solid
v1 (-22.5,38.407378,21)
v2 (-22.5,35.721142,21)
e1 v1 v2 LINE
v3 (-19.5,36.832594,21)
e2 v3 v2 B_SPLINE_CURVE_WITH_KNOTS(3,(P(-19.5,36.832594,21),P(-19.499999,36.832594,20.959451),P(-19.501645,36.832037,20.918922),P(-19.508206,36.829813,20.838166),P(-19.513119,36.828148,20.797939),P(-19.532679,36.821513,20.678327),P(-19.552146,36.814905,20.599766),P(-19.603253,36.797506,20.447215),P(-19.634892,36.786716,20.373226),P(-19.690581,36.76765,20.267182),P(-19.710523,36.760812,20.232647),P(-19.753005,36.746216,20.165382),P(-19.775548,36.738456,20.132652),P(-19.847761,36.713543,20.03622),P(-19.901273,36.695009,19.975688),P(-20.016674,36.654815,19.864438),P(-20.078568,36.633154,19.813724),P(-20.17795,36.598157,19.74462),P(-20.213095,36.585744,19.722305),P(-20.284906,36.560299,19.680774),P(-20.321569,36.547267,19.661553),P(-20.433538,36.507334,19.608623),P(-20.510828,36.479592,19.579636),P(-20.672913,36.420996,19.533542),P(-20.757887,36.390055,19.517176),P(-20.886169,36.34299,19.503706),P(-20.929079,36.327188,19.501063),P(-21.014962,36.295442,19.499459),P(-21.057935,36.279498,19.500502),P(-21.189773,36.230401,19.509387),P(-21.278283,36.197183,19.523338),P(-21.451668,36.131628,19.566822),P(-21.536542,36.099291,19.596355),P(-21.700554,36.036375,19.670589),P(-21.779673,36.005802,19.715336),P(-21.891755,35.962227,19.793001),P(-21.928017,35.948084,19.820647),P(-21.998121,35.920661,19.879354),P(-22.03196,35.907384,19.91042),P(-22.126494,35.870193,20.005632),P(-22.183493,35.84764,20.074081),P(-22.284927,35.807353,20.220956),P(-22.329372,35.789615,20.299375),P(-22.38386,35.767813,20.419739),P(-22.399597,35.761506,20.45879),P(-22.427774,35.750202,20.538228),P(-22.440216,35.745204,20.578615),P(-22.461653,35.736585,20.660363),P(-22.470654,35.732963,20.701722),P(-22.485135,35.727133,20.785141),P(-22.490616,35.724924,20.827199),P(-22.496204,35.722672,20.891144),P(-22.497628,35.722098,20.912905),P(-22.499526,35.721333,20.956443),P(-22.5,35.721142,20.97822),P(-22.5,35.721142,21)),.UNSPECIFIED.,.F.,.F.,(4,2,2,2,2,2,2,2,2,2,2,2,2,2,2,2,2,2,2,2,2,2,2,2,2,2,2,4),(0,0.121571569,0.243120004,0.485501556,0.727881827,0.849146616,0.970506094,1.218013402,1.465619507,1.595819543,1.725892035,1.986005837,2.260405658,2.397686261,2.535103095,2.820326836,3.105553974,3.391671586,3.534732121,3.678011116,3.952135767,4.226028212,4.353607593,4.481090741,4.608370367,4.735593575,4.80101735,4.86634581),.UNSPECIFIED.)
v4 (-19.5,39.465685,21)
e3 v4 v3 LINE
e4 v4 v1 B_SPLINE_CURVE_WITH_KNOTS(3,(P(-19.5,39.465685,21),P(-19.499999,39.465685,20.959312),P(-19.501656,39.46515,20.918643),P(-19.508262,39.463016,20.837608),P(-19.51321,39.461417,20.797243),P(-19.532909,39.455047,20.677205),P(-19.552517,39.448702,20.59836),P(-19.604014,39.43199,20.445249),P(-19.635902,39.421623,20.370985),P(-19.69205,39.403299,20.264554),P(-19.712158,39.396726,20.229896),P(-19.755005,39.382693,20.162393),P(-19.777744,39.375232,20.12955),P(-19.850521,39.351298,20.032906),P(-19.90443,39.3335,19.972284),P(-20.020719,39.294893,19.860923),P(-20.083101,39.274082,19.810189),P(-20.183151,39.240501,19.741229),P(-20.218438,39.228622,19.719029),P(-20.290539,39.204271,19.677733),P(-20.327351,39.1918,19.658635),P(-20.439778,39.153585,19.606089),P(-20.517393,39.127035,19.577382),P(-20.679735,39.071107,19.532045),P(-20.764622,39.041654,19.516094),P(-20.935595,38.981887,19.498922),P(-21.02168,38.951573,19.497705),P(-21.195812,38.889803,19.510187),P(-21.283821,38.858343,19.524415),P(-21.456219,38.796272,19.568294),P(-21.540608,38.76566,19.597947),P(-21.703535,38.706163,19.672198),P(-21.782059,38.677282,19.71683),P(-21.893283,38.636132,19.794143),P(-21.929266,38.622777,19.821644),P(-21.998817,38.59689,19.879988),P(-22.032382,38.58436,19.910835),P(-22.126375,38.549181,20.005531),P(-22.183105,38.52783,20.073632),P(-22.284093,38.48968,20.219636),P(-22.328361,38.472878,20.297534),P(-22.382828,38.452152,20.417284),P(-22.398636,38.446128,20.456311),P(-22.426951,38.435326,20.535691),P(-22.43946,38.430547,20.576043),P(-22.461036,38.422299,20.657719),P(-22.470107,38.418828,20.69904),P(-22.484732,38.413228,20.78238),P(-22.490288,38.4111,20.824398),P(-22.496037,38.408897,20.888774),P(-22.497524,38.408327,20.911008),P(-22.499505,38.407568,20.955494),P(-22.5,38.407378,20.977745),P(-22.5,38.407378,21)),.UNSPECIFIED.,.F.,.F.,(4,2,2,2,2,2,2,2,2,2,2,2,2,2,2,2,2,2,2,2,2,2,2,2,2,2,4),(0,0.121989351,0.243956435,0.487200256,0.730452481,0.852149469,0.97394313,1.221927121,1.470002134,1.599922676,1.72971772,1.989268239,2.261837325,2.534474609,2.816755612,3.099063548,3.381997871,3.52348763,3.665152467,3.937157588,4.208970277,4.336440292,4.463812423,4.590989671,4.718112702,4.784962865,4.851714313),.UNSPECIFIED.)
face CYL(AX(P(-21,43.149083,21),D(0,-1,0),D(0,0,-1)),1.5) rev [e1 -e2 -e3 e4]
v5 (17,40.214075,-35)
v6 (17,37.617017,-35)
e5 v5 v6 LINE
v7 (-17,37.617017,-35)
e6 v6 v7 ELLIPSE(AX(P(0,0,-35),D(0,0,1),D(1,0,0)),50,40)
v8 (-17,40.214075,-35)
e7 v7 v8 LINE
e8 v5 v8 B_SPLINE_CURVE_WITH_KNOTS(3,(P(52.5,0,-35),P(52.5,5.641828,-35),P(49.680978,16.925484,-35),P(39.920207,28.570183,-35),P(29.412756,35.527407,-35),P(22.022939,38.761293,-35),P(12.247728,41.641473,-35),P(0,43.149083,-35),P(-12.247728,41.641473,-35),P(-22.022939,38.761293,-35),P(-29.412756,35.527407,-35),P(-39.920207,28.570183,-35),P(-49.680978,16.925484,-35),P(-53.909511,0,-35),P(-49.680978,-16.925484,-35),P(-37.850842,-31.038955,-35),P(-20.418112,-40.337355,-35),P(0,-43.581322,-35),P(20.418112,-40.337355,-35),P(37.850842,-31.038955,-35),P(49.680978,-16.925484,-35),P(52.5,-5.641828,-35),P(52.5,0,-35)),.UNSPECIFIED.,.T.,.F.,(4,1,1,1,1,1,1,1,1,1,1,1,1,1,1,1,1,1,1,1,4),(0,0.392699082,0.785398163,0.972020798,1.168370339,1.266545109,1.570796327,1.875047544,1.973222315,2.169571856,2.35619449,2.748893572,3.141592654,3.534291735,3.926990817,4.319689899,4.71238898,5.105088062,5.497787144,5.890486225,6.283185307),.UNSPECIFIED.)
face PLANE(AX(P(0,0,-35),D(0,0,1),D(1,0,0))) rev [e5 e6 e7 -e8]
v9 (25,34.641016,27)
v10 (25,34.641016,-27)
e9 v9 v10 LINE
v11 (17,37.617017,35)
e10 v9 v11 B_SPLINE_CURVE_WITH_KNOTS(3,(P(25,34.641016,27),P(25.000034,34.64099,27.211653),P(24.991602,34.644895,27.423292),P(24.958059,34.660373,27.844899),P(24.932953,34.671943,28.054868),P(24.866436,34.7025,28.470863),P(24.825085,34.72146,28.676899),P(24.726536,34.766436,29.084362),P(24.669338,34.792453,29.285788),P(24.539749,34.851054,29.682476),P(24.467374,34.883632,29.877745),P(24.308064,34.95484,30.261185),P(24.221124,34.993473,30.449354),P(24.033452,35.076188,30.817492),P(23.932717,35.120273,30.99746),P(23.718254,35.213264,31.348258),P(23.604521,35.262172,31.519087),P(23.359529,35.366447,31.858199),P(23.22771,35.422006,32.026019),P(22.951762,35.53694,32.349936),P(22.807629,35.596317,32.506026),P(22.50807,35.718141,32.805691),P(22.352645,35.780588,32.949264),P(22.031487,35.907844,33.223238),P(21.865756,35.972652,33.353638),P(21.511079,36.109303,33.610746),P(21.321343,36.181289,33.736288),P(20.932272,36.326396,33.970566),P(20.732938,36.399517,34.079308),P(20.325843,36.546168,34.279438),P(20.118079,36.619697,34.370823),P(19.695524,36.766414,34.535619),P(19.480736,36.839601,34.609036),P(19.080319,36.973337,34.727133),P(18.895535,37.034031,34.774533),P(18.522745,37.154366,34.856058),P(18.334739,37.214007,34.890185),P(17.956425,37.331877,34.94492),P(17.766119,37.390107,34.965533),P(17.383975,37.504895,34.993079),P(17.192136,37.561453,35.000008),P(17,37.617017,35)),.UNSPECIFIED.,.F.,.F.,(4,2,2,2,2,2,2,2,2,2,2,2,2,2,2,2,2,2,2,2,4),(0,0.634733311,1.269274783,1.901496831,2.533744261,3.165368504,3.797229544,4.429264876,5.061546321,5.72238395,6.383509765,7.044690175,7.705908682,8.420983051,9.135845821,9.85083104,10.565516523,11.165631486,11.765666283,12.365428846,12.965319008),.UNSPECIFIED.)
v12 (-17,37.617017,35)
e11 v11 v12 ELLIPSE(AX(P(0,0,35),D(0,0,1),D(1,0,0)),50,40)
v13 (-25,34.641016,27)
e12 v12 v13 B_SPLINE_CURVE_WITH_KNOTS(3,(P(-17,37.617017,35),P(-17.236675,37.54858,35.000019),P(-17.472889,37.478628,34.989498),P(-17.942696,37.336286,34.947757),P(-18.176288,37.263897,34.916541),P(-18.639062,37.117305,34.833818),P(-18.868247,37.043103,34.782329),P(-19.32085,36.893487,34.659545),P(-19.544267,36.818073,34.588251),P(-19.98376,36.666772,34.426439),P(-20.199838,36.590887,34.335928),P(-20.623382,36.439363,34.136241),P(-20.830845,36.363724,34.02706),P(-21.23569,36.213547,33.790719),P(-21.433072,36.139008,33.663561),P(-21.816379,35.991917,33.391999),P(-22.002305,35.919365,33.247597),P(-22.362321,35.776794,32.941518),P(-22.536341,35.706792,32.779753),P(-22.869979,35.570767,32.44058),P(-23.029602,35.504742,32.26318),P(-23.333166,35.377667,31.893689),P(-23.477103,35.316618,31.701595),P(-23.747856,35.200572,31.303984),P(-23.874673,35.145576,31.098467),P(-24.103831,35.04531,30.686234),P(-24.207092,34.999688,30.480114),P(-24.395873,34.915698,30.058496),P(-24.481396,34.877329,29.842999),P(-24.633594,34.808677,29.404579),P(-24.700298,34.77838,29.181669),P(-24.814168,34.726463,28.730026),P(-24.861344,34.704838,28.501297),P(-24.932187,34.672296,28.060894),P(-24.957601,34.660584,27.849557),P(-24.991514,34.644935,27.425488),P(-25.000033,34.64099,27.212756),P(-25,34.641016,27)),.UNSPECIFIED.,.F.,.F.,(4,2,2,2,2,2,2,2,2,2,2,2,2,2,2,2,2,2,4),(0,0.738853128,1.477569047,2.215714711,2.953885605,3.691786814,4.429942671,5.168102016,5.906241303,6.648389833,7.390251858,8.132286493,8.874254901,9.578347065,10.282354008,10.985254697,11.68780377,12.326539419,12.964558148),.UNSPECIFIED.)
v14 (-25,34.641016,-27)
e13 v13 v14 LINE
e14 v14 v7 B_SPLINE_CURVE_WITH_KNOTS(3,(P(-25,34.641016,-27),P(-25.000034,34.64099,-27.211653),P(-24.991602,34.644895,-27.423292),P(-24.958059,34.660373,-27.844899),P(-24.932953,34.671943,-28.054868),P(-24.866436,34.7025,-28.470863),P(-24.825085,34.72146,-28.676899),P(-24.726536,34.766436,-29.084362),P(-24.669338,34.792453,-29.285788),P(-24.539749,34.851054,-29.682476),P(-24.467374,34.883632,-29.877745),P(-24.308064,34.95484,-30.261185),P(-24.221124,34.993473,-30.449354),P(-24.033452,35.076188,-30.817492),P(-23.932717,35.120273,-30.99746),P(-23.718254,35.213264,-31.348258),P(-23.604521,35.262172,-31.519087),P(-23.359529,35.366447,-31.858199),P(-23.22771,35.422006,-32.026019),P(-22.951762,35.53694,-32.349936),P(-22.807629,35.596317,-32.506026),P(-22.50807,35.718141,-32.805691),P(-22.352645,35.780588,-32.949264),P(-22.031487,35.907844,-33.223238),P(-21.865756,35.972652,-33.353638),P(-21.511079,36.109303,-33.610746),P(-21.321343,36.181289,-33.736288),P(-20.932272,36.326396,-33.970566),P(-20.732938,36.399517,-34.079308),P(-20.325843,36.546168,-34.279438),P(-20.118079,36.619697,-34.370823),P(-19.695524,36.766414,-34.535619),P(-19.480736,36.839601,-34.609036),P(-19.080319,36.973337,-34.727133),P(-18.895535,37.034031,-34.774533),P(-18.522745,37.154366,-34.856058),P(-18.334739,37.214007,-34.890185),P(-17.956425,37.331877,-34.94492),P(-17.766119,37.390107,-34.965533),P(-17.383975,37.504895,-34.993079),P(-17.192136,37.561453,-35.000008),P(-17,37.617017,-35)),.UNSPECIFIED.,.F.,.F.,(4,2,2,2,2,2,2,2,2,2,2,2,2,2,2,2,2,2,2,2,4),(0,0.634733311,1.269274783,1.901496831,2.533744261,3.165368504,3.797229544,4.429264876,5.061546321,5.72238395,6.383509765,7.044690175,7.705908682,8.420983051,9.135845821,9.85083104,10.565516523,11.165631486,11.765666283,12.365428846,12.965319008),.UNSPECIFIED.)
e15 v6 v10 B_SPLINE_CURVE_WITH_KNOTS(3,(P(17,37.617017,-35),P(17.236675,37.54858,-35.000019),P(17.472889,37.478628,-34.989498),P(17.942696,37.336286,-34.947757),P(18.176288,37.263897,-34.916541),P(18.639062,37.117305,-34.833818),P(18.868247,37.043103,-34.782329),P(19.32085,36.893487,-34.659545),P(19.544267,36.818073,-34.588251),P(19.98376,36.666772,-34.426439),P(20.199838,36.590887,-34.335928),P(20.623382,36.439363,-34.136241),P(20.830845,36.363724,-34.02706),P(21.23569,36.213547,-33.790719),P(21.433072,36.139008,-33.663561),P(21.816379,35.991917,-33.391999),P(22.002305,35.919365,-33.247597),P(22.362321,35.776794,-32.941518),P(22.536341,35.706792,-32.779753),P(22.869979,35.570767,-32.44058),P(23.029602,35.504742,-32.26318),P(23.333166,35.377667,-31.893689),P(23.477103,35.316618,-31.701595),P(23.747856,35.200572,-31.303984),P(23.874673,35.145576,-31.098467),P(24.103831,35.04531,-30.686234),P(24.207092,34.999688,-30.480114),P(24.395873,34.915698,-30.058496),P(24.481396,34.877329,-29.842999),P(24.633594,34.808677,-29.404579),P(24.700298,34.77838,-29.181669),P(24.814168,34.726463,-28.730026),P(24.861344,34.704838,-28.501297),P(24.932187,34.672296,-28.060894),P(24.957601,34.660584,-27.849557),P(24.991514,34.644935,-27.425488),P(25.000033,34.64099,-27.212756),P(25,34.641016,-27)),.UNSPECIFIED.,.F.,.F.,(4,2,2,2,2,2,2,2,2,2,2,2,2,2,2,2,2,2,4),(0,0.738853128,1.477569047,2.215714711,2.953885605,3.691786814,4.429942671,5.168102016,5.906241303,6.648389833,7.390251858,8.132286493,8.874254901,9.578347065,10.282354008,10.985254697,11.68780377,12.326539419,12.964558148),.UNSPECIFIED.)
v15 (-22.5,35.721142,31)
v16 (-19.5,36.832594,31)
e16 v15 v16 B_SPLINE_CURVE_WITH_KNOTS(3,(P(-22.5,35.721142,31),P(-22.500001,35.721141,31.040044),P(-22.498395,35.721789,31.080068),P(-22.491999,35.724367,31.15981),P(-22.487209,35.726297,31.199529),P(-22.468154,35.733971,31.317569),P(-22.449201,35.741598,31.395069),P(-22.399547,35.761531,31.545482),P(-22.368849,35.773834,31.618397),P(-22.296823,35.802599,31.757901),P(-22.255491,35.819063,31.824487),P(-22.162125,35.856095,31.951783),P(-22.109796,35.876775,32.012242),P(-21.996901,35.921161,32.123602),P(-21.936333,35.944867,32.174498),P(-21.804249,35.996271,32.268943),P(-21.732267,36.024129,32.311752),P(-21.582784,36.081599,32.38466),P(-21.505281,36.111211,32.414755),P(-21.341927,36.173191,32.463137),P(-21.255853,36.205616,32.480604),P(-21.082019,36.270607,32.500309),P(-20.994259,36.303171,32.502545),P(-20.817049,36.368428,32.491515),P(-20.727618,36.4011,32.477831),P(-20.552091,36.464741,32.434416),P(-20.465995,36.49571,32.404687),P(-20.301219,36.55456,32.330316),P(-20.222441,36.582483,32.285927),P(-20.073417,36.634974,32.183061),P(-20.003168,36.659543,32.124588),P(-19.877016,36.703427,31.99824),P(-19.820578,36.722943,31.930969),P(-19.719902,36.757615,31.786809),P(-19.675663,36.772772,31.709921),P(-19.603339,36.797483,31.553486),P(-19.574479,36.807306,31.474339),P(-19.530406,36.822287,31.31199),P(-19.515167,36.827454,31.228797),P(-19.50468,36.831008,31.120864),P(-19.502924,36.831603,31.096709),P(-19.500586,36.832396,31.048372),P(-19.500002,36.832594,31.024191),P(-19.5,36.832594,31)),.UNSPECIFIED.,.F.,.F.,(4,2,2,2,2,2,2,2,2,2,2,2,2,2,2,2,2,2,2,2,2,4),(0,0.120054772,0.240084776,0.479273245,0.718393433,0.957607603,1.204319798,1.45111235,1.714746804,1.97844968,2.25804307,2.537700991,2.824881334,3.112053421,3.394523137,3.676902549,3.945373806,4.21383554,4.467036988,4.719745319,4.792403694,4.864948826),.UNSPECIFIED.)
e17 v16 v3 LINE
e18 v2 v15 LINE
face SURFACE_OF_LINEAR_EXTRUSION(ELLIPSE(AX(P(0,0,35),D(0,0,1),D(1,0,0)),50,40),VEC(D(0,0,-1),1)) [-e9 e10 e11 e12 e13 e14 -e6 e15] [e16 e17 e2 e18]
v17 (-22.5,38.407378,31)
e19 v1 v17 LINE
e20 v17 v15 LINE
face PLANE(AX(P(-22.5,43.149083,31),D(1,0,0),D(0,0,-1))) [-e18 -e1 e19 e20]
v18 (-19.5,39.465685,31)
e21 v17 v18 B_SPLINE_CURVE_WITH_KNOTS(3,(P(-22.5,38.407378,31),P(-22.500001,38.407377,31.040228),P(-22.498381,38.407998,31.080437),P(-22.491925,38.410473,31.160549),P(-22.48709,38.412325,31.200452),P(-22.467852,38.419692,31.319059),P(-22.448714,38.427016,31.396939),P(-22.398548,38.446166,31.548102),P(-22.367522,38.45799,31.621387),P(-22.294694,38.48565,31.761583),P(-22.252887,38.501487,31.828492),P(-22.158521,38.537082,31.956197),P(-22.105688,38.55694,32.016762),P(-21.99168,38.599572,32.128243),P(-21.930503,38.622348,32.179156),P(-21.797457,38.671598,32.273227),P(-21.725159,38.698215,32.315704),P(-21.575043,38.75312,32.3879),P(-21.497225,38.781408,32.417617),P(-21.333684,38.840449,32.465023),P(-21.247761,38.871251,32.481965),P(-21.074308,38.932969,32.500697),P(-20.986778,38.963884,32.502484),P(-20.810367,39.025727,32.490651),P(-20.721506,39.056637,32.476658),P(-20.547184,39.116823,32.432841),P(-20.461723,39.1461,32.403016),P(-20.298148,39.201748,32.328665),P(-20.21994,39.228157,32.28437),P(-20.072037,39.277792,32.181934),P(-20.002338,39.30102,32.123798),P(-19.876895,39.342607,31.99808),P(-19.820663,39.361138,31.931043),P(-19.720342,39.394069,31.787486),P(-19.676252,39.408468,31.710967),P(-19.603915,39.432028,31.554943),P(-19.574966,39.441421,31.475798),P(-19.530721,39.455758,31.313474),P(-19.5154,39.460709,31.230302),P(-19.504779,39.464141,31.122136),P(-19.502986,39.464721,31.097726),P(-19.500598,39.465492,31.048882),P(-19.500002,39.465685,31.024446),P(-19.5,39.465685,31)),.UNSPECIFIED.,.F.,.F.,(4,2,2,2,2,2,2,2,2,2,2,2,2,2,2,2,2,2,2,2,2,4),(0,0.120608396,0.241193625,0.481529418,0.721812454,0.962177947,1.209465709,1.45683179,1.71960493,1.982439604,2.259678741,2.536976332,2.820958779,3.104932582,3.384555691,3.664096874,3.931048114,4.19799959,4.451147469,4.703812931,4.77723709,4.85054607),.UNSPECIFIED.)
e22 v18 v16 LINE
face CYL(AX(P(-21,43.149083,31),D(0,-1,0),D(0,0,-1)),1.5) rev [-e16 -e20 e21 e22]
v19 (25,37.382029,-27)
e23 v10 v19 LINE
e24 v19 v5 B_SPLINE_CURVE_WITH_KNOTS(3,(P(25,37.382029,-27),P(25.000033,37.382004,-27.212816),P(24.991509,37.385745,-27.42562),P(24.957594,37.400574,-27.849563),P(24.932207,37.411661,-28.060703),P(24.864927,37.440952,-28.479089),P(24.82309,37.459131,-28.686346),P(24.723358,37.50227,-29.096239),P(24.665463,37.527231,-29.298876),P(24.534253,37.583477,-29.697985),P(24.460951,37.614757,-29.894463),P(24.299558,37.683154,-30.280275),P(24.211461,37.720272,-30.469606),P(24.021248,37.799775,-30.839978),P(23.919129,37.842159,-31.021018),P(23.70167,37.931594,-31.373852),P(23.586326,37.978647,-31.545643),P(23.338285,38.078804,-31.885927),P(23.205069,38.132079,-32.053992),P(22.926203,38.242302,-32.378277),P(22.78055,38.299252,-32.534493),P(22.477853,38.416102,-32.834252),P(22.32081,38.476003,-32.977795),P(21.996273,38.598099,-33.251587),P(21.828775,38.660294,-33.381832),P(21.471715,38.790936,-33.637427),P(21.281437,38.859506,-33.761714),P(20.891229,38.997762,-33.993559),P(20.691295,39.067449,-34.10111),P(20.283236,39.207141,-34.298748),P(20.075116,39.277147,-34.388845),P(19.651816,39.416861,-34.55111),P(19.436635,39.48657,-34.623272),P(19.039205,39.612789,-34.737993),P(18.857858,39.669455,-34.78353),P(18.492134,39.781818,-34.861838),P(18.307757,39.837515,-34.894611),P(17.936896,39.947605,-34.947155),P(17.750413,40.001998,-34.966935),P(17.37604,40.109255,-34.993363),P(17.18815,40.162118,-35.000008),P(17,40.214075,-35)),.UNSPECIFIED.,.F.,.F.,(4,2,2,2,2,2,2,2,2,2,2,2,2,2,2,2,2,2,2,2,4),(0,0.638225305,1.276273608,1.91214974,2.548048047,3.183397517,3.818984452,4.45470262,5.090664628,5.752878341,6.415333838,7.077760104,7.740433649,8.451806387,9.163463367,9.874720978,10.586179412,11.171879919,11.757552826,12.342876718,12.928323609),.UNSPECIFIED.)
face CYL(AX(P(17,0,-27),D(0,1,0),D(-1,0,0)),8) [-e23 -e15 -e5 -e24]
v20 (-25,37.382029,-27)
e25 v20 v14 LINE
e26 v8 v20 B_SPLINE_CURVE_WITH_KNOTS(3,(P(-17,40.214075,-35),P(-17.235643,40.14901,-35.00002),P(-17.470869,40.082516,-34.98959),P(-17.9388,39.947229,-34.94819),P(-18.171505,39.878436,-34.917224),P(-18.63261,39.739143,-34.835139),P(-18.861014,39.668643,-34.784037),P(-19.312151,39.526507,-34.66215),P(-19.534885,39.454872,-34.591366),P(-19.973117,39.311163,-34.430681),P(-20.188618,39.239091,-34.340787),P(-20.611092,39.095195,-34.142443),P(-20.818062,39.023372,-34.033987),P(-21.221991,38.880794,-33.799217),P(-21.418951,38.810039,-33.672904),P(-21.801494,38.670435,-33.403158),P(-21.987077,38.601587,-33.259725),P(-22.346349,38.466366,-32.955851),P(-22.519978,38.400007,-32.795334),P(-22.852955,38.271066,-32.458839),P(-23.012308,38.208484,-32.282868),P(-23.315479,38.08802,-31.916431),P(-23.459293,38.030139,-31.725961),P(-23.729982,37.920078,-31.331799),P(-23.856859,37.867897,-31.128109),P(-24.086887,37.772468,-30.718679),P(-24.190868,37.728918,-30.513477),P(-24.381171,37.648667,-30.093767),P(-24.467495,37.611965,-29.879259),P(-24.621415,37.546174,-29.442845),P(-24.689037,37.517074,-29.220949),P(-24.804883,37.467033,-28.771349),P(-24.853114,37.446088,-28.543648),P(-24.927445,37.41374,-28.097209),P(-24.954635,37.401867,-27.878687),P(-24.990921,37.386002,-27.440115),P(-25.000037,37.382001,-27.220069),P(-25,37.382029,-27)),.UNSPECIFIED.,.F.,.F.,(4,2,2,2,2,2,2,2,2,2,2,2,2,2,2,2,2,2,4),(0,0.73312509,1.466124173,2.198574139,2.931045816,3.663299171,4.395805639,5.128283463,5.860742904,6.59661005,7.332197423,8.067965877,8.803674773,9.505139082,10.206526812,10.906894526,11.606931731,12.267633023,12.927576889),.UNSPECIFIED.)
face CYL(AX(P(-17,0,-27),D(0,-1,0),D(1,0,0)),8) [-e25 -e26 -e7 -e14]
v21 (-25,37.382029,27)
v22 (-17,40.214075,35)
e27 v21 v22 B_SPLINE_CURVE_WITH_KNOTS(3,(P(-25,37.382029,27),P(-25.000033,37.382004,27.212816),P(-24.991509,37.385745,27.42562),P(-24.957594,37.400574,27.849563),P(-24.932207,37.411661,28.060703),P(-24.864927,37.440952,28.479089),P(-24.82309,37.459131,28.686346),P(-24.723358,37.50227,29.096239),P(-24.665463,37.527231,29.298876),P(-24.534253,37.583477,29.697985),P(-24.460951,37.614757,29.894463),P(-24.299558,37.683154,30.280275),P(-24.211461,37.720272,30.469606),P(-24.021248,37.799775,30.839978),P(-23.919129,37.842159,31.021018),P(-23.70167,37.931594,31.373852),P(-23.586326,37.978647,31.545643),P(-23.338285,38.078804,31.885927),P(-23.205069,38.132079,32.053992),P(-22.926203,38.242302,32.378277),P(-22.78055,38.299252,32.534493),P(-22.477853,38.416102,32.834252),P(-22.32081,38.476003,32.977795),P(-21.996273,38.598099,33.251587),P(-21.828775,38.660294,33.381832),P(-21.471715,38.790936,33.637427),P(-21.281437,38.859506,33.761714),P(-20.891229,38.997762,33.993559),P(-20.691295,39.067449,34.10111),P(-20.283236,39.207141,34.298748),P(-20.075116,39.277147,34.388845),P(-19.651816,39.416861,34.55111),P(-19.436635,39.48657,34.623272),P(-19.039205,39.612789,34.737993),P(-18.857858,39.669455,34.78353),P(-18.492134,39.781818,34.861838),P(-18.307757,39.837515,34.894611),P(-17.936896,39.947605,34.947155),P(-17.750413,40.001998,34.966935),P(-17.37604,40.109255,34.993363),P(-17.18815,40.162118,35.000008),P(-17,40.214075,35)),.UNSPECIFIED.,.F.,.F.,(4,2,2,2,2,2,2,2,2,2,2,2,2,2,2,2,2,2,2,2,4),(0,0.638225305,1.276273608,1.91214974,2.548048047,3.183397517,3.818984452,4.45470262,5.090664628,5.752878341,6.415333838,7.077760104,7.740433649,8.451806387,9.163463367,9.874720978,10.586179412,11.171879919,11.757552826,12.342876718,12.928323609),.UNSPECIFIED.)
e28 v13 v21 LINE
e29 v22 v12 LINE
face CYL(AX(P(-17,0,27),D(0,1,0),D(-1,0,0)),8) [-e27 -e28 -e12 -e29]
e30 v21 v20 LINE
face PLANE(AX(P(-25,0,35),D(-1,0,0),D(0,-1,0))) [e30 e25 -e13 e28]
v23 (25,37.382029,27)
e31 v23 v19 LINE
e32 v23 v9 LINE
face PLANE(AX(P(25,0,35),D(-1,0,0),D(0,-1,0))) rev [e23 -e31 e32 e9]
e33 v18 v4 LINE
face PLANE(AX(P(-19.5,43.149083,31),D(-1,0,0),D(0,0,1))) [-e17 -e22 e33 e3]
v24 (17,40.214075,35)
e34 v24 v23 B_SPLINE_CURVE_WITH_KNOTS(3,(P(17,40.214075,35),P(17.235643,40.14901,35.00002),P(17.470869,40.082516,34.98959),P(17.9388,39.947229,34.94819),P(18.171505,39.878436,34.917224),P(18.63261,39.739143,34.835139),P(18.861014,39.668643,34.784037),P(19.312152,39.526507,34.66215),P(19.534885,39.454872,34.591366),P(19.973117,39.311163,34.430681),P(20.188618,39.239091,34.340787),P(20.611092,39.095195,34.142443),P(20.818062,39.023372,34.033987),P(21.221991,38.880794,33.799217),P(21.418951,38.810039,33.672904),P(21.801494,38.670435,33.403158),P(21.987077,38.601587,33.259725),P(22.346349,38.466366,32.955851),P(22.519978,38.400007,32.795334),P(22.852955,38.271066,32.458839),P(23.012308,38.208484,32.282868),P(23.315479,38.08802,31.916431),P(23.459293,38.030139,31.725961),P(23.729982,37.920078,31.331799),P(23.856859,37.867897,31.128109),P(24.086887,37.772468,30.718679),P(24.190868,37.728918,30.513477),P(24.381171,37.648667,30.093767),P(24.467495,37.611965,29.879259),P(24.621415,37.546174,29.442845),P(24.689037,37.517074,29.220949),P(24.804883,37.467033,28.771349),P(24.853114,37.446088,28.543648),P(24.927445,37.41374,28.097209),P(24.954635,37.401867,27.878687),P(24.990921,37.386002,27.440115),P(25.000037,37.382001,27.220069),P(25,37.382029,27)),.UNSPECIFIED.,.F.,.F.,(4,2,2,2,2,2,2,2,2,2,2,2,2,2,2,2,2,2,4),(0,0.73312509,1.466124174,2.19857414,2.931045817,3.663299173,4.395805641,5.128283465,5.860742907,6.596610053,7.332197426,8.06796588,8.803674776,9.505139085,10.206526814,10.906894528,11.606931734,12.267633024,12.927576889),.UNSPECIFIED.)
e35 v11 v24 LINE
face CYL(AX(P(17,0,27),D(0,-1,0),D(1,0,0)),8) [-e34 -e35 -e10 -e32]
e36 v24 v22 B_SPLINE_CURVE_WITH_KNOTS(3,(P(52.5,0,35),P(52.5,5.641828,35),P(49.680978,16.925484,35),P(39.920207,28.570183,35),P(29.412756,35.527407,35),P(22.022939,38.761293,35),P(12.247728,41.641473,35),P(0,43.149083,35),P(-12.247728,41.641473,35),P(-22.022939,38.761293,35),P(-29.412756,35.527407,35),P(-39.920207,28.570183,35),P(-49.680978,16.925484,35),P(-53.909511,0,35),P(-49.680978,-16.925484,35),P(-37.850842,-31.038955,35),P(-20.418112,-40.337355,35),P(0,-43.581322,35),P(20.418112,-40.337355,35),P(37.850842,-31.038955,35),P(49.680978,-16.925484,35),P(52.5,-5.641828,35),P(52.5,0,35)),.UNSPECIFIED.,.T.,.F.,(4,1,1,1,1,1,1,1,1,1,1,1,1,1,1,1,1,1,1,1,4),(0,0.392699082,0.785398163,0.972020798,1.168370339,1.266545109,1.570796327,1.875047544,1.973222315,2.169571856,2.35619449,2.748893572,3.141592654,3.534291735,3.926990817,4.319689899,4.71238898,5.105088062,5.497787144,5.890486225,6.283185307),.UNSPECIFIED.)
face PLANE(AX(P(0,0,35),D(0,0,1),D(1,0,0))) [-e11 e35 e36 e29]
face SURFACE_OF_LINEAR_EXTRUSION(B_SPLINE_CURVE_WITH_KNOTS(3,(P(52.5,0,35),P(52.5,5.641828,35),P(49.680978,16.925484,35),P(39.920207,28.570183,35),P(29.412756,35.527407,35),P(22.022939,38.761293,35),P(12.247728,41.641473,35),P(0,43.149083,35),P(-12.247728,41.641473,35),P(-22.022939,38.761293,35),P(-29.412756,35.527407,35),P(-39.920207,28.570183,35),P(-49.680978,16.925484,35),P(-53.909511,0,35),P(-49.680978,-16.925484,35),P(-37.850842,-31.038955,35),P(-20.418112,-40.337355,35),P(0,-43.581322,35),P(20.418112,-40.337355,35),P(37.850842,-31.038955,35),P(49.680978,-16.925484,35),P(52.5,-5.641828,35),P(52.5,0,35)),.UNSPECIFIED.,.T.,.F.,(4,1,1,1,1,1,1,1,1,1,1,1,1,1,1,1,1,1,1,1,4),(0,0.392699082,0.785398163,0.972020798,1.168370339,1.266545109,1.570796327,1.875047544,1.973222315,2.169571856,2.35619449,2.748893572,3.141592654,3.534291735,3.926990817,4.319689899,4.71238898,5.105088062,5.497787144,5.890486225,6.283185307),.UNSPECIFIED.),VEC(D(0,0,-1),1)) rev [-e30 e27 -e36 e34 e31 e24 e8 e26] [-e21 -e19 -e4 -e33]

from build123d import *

# Parameters (mm, degrees)
BOSS_EXTRUDE1_START = -35
BOSS_EXTRUDE1_DEPTH = 70
CUT_EXTRUDE1_DEPTH  = 61.466933282
FILLET1_R           = 8


# Read off the part's stored shape, not the designer's step: Boss-Extrude1
with BuildPart() as part:
    # Boss-Extrude1 outline → Boss-Extrude1 (new body)
    with BuildSketch(Plane.XY.offset(BOSS_EXTRUDE1_START)):
        with BuildLine():
            Line((25, 34.641016151), (25, 37.382028889))
            add(Edge.make_bspline(
                [(25, 37.382028889), (23.499149868, 38.038900322), (20.42020332, 39.233525172), (12.247727699, 41.641473317), (0, 43.149082804), (-12.247727699, 41.641473317), (-20.42020332, 39.233525172), (-23.499149868, 38.038900322), (-25, 37.382028889)],
                knots=[1.070195568, 1.070195568, 1.070195568, 1.070195568, 1.168370339, 1.266545109, 1.570796327, 1.875047544, 1.973222315, 2.071397085, 2.071397085, 2.071397085, 2.071397085], degree=3))
            Line((-25, 37.382028889), (-25, 34.641016151))
            add(Edge.make_bspline(
                [(25, 34.641016151), (0, 46.188021535), (-25, 34.641016151)],
                knots=[1.047197551, 1.047197551, 1.047197551, 2.094395102, 2.094395102, 2.094395102], degree=2, weights=[1, 0.866025404, 1]))
        make_face()
    extrude(amount=BOSS_EXTRUDE1_DEPTH)

    # Sketch5 → Cut-Extrude1 (cut, through all)
    with BuildSketch(Plane(origin=(0, 0, 0), x_dir=(1, 0, 0), z_dir=(0, 1, 0))):
        with BuildLine():
            Line((-22.5, -31), (-22.5, -21))
            ThreePointArc((-22.5, -21), (-21, -19.5), (-19.5, -21))
            Line((-19.5, -21), (-19.5, -31))
            ThreePointArc((-19.5, -31), (-21, -32.5), (-22.5, -31))
        make_face()
    extrude(amount=CUT_EXTRUDE1_DEPTH, mode=Mode.SUBTRACT)

    # Fillet1
    # the kernel refuses this fillet: 8 mm, written as the material it takes off along each edge
    with BuildSketch(Plane(origin=(-25, 57.382028889, -35), x_dir=(1, 0, 0), z_dir=(0, -1, 0)), Plane(origin=(25, 14.641016151, 35), x_dir=(0, 0, -1), z_dir=(0, 1, 0))) as fillet1_piece_1:
        with BuildLine():
            CenterArc((FILLET1_R, FILLET1_R), FILLET1_R, 180, 90)
            Line((0, FILLET1_R), (0, 0))
            Line((0, 0), (FILLET1_R, 0))
        make_face()
    extrude(amount=42.741012738, mode=Mode.SUBTRACT)
    with BuildSketch(Plane(origin=(-25, 57.382028889, 35), x_dir=(1, 0, 0), z_dir=(0, -1, 0)), Plane(origin=(25, 14.641016151, -35), x_dir=(0, 0, 1), z_dir=(0, 1, 0))) as fillet1_piece_2:
        with BuildLine():
            CenterArc((FILLET1_R, -FILLET1_R), FILLET1_R, 90, 90)
            Line((0, -FILLET1_R), (0, 0))
            Line((0, 0), (FILLET1_R, 0))
        make_face()
    extrude(amount=42.741012738, mode=Mode.SUBTRACT)


solid = part.part
